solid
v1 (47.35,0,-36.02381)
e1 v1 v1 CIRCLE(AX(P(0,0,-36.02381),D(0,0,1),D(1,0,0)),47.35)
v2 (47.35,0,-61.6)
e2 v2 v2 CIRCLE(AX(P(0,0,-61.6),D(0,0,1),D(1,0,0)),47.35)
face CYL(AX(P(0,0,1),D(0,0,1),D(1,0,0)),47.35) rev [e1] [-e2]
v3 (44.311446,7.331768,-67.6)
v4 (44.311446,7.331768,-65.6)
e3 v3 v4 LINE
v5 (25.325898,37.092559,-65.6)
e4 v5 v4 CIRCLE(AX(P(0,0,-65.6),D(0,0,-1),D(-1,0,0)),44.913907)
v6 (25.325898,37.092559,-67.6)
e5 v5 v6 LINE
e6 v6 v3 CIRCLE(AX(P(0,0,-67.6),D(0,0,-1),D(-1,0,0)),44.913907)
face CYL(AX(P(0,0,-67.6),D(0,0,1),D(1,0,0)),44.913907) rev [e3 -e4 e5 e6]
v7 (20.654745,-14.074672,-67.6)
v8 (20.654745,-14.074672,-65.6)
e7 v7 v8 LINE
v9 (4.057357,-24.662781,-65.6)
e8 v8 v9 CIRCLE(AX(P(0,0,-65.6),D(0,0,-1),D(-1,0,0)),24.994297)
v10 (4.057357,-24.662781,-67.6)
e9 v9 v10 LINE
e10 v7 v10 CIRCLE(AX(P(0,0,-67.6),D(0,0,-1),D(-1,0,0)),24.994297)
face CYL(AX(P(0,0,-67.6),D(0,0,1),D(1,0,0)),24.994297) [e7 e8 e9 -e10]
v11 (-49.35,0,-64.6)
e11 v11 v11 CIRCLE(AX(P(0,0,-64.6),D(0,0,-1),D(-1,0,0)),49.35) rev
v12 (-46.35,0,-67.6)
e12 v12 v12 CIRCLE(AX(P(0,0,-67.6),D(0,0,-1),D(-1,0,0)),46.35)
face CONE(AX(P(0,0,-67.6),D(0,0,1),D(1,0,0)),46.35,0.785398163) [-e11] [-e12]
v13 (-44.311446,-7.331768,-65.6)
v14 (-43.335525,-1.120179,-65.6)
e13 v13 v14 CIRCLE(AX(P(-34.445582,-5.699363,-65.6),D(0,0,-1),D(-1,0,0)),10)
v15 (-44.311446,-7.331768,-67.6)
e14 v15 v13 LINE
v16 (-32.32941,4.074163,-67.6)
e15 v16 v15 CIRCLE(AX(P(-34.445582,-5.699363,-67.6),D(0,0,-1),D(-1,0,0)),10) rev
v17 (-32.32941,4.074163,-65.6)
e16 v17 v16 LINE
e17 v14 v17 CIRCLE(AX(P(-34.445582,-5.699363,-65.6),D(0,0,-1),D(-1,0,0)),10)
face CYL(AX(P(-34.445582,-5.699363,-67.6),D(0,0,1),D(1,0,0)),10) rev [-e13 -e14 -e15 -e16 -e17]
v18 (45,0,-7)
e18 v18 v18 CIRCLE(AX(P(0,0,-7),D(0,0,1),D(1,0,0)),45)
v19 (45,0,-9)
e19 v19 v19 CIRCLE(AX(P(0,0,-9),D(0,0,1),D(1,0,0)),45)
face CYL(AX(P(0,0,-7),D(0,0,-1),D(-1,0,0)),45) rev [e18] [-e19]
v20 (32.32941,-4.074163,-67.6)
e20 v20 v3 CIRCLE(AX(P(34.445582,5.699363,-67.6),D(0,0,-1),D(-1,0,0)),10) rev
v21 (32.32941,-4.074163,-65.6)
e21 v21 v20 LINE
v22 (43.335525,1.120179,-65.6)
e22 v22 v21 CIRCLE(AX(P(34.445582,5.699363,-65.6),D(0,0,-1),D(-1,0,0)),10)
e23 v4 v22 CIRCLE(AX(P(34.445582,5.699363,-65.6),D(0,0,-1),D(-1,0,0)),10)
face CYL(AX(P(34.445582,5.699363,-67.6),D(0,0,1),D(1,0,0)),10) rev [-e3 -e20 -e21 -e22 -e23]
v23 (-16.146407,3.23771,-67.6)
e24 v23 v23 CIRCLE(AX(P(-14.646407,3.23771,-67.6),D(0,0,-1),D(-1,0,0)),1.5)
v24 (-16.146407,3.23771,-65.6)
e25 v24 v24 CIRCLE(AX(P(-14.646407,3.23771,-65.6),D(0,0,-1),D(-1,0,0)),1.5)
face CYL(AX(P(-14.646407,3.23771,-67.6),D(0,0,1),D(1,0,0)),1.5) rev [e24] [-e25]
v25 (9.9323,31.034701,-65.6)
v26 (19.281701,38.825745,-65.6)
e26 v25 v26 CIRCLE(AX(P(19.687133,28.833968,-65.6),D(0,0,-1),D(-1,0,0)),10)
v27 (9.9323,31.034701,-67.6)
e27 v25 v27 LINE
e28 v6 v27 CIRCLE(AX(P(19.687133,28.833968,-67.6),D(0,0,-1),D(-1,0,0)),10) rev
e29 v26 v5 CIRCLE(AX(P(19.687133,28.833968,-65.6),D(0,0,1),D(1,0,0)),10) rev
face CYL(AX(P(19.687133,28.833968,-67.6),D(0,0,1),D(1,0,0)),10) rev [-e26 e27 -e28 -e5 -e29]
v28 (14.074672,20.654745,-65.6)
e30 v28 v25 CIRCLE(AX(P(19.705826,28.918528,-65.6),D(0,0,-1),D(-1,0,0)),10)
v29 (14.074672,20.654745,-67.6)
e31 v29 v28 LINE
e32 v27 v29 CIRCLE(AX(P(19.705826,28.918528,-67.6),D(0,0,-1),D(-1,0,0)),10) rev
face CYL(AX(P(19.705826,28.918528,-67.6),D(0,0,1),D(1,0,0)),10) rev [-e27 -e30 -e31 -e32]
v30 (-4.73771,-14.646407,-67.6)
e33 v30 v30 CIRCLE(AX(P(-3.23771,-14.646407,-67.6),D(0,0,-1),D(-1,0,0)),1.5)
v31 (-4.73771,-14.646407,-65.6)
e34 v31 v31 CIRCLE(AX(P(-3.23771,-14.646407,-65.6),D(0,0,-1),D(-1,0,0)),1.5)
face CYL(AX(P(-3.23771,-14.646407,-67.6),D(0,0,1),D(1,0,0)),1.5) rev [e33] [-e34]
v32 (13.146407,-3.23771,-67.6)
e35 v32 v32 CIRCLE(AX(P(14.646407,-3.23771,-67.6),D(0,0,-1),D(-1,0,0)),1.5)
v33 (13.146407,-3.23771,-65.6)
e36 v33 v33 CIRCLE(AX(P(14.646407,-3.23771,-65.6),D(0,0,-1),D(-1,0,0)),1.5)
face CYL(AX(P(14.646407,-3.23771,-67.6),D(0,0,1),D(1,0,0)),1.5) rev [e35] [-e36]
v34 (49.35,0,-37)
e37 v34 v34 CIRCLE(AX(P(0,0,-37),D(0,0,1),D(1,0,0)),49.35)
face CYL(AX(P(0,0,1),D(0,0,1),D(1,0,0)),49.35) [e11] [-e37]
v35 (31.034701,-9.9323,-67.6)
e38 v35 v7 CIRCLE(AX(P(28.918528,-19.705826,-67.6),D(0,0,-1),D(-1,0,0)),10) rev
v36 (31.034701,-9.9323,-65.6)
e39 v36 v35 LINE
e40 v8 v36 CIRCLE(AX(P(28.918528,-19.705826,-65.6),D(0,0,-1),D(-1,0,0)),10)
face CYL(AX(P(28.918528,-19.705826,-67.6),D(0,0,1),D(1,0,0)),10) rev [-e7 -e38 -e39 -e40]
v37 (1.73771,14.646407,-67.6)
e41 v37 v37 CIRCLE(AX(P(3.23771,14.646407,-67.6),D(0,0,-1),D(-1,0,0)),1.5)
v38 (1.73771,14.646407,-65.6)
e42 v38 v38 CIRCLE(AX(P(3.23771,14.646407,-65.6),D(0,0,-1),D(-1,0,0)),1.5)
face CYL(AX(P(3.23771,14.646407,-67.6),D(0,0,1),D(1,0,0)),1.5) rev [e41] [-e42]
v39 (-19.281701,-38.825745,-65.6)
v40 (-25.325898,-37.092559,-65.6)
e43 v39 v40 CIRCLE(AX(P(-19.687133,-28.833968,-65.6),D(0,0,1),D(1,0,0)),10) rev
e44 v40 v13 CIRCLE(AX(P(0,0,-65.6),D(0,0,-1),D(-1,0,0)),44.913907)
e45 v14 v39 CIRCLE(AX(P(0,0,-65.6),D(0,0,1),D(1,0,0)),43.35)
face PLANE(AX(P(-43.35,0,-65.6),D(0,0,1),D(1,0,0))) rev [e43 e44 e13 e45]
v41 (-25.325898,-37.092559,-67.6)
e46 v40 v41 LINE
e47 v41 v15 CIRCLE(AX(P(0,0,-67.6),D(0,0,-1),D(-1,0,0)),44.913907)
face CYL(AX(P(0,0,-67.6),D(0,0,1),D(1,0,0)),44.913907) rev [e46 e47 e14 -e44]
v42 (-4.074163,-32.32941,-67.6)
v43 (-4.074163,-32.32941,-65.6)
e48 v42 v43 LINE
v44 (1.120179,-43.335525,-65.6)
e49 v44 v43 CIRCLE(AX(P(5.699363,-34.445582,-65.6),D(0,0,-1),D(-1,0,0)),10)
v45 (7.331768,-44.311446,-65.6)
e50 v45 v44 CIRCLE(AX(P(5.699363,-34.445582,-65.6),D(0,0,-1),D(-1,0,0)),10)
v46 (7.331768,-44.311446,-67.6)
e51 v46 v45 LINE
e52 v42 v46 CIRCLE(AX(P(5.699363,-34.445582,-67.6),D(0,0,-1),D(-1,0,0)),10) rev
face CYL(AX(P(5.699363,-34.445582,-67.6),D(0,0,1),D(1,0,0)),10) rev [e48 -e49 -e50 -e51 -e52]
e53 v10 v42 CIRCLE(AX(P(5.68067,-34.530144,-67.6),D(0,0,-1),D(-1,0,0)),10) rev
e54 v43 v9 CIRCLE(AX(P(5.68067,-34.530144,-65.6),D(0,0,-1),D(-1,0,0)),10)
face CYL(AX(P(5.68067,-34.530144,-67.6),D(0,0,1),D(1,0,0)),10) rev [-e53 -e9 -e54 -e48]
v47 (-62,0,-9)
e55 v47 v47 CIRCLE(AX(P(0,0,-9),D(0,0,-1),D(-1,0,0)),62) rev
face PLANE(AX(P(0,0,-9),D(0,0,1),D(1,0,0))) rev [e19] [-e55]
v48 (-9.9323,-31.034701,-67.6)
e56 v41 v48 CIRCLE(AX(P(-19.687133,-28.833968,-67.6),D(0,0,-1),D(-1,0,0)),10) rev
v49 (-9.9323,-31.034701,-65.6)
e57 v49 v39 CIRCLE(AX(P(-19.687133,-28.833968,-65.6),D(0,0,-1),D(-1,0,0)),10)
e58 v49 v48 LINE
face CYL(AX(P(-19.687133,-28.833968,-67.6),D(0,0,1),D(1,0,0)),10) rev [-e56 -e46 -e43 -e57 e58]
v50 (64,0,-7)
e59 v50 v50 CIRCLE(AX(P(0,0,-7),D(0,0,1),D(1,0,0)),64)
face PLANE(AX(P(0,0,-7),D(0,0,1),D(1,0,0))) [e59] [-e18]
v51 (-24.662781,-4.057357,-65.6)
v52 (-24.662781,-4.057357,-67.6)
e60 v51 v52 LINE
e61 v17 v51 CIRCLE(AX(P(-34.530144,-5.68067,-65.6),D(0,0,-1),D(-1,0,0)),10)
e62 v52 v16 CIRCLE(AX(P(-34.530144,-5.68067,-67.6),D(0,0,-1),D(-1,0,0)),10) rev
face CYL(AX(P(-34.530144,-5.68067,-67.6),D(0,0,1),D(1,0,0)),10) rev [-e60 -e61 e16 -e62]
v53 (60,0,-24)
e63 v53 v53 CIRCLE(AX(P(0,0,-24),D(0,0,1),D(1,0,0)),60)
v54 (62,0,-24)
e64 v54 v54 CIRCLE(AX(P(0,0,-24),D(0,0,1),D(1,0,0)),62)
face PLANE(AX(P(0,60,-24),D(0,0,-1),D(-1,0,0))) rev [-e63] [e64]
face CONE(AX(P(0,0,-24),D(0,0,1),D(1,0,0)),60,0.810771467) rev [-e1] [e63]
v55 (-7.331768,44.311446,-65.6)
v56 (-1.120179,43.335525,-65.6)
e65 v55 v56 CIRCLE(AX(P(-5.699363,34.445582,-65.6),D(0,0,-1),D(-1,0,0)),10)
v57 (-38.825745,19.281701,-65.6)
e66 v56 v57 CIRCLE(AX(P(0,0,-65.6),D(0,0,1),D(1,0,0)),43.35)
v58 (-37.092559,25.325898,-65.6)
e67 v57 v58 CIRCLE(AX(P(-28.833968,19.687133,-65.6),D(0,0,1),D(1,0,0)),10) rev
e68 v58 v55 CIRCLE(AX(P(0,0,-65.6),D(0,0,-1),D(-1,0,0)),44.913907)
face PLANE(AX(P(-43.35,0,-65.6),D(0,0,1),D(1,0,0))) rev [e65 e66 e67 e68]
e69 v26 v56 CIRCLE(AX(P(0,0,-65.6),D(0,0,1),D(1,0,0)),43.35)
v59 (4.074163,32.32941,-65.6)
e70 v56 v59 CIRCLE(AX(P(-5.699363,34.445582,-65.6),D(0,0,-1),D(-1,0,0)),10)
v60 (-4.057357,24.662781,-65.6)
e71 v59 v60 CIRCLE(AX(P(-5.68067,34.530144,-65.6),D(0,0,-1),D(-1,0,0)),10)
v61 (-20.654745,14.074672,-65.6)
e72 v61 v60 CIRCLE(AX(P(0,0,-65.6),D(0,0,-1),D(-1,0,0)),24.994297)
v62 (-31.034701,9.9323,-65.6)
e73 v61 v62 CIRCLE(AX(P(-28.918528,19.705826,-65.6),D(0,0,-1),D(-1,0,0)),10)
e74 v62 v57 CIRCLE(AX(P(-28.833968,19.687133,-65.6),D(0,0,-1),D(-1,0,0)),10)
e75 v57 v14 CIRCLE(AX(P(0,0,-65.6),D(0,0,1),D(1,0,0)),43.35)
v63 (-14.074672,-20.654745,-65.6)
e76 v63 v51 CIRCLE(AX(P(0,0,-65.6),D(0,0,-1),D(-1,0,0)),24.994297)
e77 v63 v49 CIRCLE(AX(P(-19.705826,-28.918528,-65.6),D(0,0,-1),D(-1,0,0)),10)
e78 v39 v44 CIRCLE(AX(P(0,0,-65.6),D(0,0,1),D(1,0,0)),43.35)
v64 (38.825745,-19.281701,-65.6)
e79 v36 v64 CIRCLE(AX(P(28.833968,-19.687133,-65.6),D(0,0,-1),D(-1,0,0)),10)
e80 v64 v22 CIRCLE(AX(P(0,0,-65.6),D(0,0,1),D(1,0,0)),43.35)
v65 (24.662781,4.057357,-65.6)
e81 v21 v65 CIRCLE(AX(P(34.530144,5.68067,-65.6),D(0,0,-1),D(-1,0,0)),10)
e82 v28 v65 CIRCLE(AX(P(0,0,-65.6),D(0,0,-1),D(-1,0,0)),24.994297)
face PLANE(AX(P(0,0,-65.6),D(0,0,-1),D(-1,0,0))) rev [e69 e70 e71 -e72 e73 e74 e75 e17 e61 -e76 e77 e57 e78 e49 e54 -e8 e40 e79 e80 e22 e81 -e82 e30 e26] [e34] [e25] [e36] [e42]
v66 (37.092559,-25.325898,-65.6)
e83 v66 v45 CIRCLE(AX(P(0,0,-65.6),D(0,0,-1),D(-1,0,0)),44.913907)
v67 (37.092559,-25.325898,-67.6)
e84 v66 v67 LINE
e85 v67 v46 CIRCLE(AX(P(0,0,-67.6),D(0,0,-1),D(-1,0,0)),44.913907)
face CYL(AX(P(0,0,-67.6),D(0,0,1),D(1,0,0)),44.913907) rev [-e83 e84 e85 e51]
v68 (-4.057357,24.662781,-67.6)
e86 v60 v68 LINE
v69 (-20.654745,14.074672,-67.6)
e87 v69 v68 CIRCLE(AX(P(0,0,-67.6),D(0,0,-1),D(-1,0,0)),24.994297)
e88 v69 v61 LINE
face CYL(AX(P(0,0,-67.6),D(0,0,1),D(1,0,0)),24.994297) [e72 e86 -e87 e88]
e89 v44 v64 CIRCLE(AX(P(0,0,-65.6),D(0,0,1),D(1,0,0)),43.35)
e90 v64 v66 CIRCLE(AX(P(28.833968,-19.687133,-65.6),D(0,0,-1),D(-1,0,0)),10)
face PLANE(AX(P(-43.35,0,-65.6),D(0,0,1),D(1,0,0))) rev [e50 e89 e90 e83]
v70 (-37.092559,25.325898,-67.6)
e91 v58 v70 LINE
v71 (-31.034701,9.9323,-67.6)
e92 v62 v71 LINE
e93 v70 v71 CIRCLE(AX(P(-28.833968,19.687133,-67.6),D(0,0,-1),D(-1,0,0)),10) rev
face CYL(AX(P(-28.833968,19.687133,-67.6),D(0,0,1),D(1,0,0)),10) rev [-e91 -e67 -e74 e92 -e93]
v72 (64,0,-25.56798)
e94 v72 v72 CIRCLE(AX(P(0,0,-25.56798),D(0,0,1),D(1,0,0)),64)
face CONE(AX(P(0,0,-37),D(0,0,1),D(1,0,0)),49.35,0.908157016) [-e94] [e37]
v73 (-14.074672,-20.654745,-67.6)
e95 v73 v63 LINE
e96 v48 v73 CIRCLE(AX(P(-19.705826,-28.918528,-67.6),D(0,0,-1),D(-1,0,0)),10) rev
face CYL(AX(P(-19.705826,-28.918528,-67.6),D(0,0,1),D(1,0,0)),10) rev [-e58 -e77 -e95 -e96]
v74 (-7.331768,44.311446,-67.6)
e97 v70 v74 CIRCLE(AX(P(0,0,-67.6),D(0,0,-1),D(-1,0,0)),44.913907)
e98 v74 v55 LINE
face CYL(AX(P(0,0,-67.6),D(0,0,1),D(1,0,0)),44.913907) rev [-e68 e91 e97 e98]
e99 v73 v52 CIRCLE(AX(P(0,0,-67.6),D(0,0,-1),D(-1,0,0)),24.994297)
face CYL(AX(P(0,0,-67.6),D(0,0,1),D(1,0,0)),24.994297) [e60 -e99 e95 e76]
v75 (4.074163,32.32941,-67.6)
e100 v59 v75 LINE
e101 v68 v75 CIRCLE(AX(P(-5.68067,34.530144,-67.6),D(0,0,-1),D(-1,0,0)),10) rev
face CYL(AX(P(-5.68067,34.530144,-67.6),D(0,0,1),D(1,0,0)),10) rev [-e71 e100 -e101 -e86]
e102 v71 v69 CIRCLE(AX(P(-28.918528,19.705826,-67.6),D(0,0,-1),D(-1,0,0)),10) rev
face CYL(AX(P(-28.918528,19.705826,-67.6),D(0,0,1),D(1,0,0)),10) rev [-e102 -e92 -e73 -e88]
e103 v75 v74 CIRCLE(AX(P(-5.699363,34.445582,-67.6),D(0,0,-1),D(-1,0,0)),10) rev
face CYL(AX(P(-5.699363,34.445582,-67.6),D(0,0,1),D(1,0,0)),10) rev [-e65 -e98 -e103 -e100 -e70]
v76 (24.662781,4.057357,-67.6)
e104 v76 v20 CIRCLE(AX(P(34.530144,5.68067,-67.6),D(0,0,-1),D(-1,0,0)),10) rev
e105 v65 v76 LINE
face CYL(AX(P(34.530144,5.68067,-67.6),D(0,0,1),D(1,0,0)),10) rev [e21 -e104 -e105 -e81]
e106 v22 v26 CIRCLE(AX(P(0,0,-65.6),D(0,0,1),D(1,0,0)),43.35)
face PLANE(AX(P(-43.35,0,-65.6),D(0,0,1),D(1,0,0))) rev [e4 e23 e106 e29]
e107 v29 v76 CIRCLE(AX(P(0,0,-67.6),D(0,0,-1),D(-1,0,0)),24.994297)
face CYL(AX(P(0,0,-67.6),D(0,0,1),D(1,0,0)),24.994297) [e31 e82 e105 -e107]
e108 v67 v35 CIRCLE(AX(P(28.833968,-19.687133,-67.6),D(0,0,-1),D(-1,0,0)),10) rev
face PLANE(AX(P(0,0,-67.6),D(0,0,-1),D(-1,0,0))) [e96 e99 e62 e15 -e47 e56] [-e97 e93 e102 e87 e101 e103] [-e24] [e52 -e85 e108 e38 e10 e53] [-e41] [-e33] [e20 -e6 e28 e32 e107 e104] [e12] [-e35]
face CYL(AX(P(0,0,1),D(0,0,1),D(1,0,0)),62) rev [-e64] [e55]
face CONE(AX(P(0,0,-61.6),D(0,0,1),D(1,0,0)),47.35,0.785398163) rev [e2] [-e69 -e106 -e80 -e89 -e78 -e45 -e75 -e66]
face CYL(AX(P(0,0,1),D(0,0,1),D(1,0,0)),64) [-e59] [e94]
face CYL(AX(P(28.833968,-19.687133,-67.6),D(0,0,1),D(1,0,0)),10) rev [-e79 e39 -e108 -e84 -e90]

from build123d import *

# Parameters (mm, degrees)
BOSS_EXTRUDE2_START = 2
SKETCH3_R           = 49.35
SKETCH3_R_2         = 1.5
BOSS_EXTRUDE2_DEPTH = 2
FILLET1_R           = 10
FILLET2_R           = 10
CHAMFER1_SIZE       = 3
SKETCH6_W           = 130.40409261
SKETCH6_H           = 9
CUT_EXTRUDE1_DEPTH  = 72
SKETCH7_R           = 64
SKETCH7_R_2         = 45
BOSS_EXTRUDE3_DEPTH = 2


with BuildPart() as part:
    # Sketch2 → Revolve1 (revolve)
    with BuildSketch(Plane(origin=(0, 0, 0), x_dir=(0, 0, -1), z_dir=(1, 0, 0)), mode=Mode.PRIVATE) as revolve1_sk:
        Polygon((65.6, 47.35), (37, 47.35), (36.023809561, 47.35), (24, 60), (24, 62), (0, 62), (0, 64), (25.567979838, 64), (37, 49.35), (65.6, 49.35), align=None)
    revolve(revolve1_sk.sketch.rotate(Axis((0, 0, 1), (0, 0, -1)), 90), axis=Axis((0, 0, 1), (0, 0, -1)))

    # Sketch3 → Boss-Extrude2 (add)
    with BuildSketch(Plane(origin=(0, 0, -65.6), x_dir=(-1, 0, 0), z_dir=(0, 0, -1)).offset(BOSS_EXTRUDE2_START)):
        with Locations(Location((0, 0, 0), (0, 0, 180))):
            Circle(SKETCH3_R)
        with Locations((-14.646406867, -3.237709975)):
            Circle(SKETCH3_R_2, mode=Mode.SUBTRACT)
        with Locations((-3.237709975, 14.646406867)):
            Circle(SKETCH3_R_2, mode=Mode.SUBTRACT)
        with Locations((3.237709975, -14.646406867)):
            Circle(SKETCH3_R_2, mode=Mode.SUBTRACT)
        with Locations((14.646406867, 3.237709975)):
            Circle(SKETCH3_R_2, mode=Mode.SUBTRACT)
        with BuildLine():
            Line((2.426668662, -24.876217196), (6.743615296, -44.404759685))
            ThreePointArc((6.743615296, -44.404759685), (-24.155488069, -37.865174318), (-43.109904177, -12.601527718))
            Line((-43.109904177, -12.601527718), (-23.581361687, -8.284581085))
            ThreePointArc((-23.581361687, -8.284581085), (-13.442501867, -21.071640807), (2.426668662, -24.876217196))
        make_face(mode=Mode.SUBTRACT)
        with BuildLine():
            Line((-24.876217196, -2.426668662), (-44.404759685, -6.743615296))
            ThreePointArc((-44.404759685, -6.743615296), (-37.865174318, 24.155488069), (-12.601527718, 43.109904177))
            Line((-12.601527718, 43.109904177), (-8.284581085, 23.581361687))
            ThreePointArc((-8.284581085, 23.581361687), (-21.071640807, 13.442501867), (-24.876217196, -2.426668662))
        make_face(mode=Mode.SUBTRACT)
        with BuildLine():
            Line((-2.426668662, 24.876217196), (-6.743615296, 44.404759685))
            ThreePointArc((-6.743615296, 44.404759685), (24.155488069, 37.865174318), (43.109904177, 12.601527718))
            Line((43.109904177, 12.601527718), (23.581361687, 8.284581085))
            ThreePointArc((23.581361687, 8.284581085), (13.442501867, 21.071640807), (-2.426668662, 24.876217196))
        make_face(mode=Mode.SUBTRACT)
        with BuildLine():
            Line((8.284581085, -23.581361687), (12.601527718, -43.109904177))
            ThreePointArc((12.601527718, -43.109904177), (37.865174318, -24.155488069), (44.404759685, 6.743615296))
            Line((44.404759685, 6.743615296), (24.876217196, 2.426668662))
            ThreePointArc((24.876217196, 2.426668662), (21.071640807, -13.442501867), (8.284581085, -23.581361687))
        make_face(mode=Mode.SUBTRACT)
    extrude(amount=-BOSS_EXTRUDE2_DEPTH)

    # Fillet1
    # the kernel refuses this fillet: 10 mm, written as the material it adds along each edge
    with BuildSketch(Plane(origin=(-12.601527718, -43.109904177, -67.6), x_dir=(-0.9040126559830293, 0.4275056933217488, 0), z_dir=(0, 0, 1))) as fillet1_piece_1:
        with BuildLine():
            CenterArc((12.508516939, -9.876472905), FILLET1_R, 80.98497739, 111.859148491)
            Line((2.758732525, -12.099467257), (0, 0))
            ThreePointArc((0, 0), (7.037725598, 0.554809366), (14.075451195, 0))
        make_face()
    extrude(amount=2)
    with BuildSketch(Plane(origin=(-8.284581085, -23.581361687, -67.6), x_dir=(-0.8924722154511289, 0.45110236604096154, 0), z_dir=(0, 0, 1))) as fillet1_piece_2:
        with BuildLine():
            CenterArc((7.785535121, 9.915423441), FILLET1_R, 194.349189504, 68.193723572)
            Line((-1.902498089, 7.437115043), (0, 0))
            ThreePointArc((0, 0), (3.243849617, 0.211393168), (6.487699233, 0))
        make_face()
    extrude(amount=2)
    with BuildSketch(Plane(origin=(-24.876217196, 2.426668662, -67.6), x_dir=(-0.9764271244734938, 0.21584733167779538, 0), z_dir=(0, 0, 1))) as fillet1_piece_3:
        with BuildLine():
            CenterArc((7.676408375, 10), FILLET1_R, 201.807483199, 68.192516801)
            ThreePointArc((-1.607964784, 6.285109014), (-0.599195502, 3.194946614), (0, 0))
            Line((0, 0), (7.676408375, 0))
        make_face()
    extrude(amount=2)
    with BuildSketch(Plane(origin=(-44.404759685, 6.743615296, -67.6), x_dir=(0.006629845184633897, -0.999978022334905, 0), z_dir=(0, 0, 1))) as fillet1_piece_4:
        with BuildLine():
            CenterArc((12.508734152, 9.876468588), FILLET1_R, 167.15489194, 111.860288522)
            Line((2.758987847, 12.099630073), (0, 0))
            ThreePointArc((0, 0), (7.037847809, -0.554828755), (14.075695618, 0))
        make_face()
    extrude(amount=2)

    # Fillet2
    # the kernel refuses this fillet: 10 mm, written as the material it adds along each edge
    with BuildSketch(Plane(origin=(-43.109904177, 12.601527718, -67.6), x_dir=(0.4275056933217496, 0.9040126559830289, 0), z_dir=(0, 0, 1))) as fillet2_piece_1:
        with BuildLine():
            CenterArc((12.508516939, -9.876472905), FILLET2_R, 80.98497739, 111.859148491)
            Line((2.758732525, -12.099467257), (0, 0))
            ThreePointArc((0, 0), (7.037725598, 0.554809366), (14.075451195, 0))
        make_face()
    extrude(amount=2)
    with BuildSketch(Plane(origin=(-23.581361687, 8.284581085, -67.6), x_dir=(-0.9764271244734907, 0.21584733167780967, 0), z_dir=(0, 0, 1)), Plane(origin=(8.284581085, 23.581361687, -67.6), x_dir=(0.21584733167780917, 0.9764271244734908, 0), z_dir=(0, 0, 1)), Plane(origin=(23.581361687, -8.284581085, -67.6), x_dir=(0.9764271244734907, -0.21584733167780934, 0), z_dir=(0, 0, 1))) as fillet2_piece_2:
        with BuildLine():
            CenterArc((7.676599451, -10), FILLET2_R, 90, 68.193723572)
            ThreePointArc((-1.607851949, -6.285304563), (-0.599127572, -3.195042028), (0, 0))
            Line((0, 0), (7.676599451, 0))
        make_face()
    extrude(amount=2)
    with BuildSketch(Plane(origin=(2.426668662, 24.876217196, -67.6), x_dir=(0.2158473316777956, 0.9764271244734938, 0), z_dir=(0, 0, 1))) as fillet2_piece_3:
        with BuildLine():
            CenterArc((7.676408375, 10), FILLET2_R, 201.807483199, 68.192516801)
            ThreePointArc((-1.607964784, 6.285109014), (-0.599195502, 3.194946614), (0, 0))
            Line((0, 0), (7.676408375, 0))
        make_face()
    extrude(amount=2)
    with BuildSketch(Plane(origin=(6.743615296, 44.404759685, -67.6), x_dir=(-0.999978022334905, -0.006629845184635393, 0), z_dir=(0, 0, 1)), Plane(origin=(44.404759685, -6.743615296, -67.6), x_dir=(-0.006629845184635893, 0.999978022334905, 0), z_dir=(0, 0, 1)), Plane(origin=(-6.743615296, -44.404759685, -67.6), x_dir=(0.999978022334905, 0.00662984518463539, 0), z_dir=(0, 0, 1))) as fillet2_piece_4:
        with BuildLine():
            CenterArc((12.508734152, 9.876468588), FILLET2_R, 167.15489194, 111.860288522)
            Line((2.758987847, 12.099630073), (0, 0))
            ThreePointArc((0, 0), (7.037847809, -0.554828755), (14.075695618, 0))
        make_face()
    extrude(amount=2)
    with BuildSketch(Plane(origin=(24.876217196, -2.426668662, -67.6), x_dir=(-0.032899449429987265, 0.9994586665926729, 0), z_dir=(0, 0, 1)), Plane(origin=(-2.426668662, -24.876217196, -67.6), x_dir=(0.9994586665926729, 0.03289944942998876, 0), z_dir=(0, 0, 1))) as fillet2_piece_5:
        with BuildLine():
            CenterArc((7.785341334, -9.915427669), FILLET2_R, 97.456900257, 68.192516801)
            Line((-1.902631601, -7.436883658), (0, 0))
            ThreePointArc((0, 0), (3.243768875, -0.2113826), (6.48753775, 0))
        make_face()
    extrude(amount=2)
    with BuildSketch(Plane(origin=(12.601527718, 43.109904177, -67.6), x_dir=(-0.21584733167780898, -0.9764271244734908, 0), z_dir=(0, 0, 1)), Plane(origin=(43.109904177, -12.601527718, -67.6), x_dir=(-0.9764271244734909, 0.21584733167780892, 0), z_dir=(0, 0, 1))) as fillet2_piece_6:
        with BuildLine():
            CenterArc((12.40998441, 10), FILLET2_R, 158.140851509, 111.859148491)
            ThreePointArc((3.128964851, 13.723261468), (1.023555255, 6.984964542), (0, 0))
            Line((0, 0), (12.40998441, 0))
        make_face()
    extrude(amount=2)

    # Sketch5 → Revolve2 (revolve)
    with BuildSketch(Plane(origin=(0, 0, 0), x_dir=(1, 0, 0), z_dir=(0, 1, 0)), mode=Mode.PRIVATE) as revolve2_sk:
        Polygon((-47.35, 61.6), (-43.35, 65.6), (-47.35, 65.6), align=None)
    revolve(revolve2_sk.sketch.rotate(Axis((0, 0, 0), (0, 0, -1)), 180), axis=Axis((0, 0, 0), (0, 0, -1)))

    # Chamfer1
    chamfer1_edges = [part.edges().sort_by_distance(p)[0] for p in [
        (-49.35, 0, -67.6),
    ]]
    chamfer(chamfer1_edges, length=CHAMFER1_SIZE)

    # Sketch6 → Cut-Extrude1 (cut, symmetric)
    with BuildSketch(Plane(origin=(0, 0, 0), x_dir=(1, 0, 0), z_dir=(0, 1, 0))):
        with Locations((-1.202046305, 4.5)):
            Rectangle(SKETCH6_W, SKETCH6_H)
    extrude(amount=CUT_EXTRUDE1_DEPTH, both=True, mode=Mode.SUBTRACT)

    # Sketch7 → Boss-Extrude3 (add)
    with BuildSketch(Plane.XY.offset(-9)):
        Circle(SKETCH7_R)
        Circle(SKETCH7_R_2, mode=Mode.SUBTRACT)
    extrude(amount=BOSS_EXTRUDE3_DEPTH)


solid = part.part
